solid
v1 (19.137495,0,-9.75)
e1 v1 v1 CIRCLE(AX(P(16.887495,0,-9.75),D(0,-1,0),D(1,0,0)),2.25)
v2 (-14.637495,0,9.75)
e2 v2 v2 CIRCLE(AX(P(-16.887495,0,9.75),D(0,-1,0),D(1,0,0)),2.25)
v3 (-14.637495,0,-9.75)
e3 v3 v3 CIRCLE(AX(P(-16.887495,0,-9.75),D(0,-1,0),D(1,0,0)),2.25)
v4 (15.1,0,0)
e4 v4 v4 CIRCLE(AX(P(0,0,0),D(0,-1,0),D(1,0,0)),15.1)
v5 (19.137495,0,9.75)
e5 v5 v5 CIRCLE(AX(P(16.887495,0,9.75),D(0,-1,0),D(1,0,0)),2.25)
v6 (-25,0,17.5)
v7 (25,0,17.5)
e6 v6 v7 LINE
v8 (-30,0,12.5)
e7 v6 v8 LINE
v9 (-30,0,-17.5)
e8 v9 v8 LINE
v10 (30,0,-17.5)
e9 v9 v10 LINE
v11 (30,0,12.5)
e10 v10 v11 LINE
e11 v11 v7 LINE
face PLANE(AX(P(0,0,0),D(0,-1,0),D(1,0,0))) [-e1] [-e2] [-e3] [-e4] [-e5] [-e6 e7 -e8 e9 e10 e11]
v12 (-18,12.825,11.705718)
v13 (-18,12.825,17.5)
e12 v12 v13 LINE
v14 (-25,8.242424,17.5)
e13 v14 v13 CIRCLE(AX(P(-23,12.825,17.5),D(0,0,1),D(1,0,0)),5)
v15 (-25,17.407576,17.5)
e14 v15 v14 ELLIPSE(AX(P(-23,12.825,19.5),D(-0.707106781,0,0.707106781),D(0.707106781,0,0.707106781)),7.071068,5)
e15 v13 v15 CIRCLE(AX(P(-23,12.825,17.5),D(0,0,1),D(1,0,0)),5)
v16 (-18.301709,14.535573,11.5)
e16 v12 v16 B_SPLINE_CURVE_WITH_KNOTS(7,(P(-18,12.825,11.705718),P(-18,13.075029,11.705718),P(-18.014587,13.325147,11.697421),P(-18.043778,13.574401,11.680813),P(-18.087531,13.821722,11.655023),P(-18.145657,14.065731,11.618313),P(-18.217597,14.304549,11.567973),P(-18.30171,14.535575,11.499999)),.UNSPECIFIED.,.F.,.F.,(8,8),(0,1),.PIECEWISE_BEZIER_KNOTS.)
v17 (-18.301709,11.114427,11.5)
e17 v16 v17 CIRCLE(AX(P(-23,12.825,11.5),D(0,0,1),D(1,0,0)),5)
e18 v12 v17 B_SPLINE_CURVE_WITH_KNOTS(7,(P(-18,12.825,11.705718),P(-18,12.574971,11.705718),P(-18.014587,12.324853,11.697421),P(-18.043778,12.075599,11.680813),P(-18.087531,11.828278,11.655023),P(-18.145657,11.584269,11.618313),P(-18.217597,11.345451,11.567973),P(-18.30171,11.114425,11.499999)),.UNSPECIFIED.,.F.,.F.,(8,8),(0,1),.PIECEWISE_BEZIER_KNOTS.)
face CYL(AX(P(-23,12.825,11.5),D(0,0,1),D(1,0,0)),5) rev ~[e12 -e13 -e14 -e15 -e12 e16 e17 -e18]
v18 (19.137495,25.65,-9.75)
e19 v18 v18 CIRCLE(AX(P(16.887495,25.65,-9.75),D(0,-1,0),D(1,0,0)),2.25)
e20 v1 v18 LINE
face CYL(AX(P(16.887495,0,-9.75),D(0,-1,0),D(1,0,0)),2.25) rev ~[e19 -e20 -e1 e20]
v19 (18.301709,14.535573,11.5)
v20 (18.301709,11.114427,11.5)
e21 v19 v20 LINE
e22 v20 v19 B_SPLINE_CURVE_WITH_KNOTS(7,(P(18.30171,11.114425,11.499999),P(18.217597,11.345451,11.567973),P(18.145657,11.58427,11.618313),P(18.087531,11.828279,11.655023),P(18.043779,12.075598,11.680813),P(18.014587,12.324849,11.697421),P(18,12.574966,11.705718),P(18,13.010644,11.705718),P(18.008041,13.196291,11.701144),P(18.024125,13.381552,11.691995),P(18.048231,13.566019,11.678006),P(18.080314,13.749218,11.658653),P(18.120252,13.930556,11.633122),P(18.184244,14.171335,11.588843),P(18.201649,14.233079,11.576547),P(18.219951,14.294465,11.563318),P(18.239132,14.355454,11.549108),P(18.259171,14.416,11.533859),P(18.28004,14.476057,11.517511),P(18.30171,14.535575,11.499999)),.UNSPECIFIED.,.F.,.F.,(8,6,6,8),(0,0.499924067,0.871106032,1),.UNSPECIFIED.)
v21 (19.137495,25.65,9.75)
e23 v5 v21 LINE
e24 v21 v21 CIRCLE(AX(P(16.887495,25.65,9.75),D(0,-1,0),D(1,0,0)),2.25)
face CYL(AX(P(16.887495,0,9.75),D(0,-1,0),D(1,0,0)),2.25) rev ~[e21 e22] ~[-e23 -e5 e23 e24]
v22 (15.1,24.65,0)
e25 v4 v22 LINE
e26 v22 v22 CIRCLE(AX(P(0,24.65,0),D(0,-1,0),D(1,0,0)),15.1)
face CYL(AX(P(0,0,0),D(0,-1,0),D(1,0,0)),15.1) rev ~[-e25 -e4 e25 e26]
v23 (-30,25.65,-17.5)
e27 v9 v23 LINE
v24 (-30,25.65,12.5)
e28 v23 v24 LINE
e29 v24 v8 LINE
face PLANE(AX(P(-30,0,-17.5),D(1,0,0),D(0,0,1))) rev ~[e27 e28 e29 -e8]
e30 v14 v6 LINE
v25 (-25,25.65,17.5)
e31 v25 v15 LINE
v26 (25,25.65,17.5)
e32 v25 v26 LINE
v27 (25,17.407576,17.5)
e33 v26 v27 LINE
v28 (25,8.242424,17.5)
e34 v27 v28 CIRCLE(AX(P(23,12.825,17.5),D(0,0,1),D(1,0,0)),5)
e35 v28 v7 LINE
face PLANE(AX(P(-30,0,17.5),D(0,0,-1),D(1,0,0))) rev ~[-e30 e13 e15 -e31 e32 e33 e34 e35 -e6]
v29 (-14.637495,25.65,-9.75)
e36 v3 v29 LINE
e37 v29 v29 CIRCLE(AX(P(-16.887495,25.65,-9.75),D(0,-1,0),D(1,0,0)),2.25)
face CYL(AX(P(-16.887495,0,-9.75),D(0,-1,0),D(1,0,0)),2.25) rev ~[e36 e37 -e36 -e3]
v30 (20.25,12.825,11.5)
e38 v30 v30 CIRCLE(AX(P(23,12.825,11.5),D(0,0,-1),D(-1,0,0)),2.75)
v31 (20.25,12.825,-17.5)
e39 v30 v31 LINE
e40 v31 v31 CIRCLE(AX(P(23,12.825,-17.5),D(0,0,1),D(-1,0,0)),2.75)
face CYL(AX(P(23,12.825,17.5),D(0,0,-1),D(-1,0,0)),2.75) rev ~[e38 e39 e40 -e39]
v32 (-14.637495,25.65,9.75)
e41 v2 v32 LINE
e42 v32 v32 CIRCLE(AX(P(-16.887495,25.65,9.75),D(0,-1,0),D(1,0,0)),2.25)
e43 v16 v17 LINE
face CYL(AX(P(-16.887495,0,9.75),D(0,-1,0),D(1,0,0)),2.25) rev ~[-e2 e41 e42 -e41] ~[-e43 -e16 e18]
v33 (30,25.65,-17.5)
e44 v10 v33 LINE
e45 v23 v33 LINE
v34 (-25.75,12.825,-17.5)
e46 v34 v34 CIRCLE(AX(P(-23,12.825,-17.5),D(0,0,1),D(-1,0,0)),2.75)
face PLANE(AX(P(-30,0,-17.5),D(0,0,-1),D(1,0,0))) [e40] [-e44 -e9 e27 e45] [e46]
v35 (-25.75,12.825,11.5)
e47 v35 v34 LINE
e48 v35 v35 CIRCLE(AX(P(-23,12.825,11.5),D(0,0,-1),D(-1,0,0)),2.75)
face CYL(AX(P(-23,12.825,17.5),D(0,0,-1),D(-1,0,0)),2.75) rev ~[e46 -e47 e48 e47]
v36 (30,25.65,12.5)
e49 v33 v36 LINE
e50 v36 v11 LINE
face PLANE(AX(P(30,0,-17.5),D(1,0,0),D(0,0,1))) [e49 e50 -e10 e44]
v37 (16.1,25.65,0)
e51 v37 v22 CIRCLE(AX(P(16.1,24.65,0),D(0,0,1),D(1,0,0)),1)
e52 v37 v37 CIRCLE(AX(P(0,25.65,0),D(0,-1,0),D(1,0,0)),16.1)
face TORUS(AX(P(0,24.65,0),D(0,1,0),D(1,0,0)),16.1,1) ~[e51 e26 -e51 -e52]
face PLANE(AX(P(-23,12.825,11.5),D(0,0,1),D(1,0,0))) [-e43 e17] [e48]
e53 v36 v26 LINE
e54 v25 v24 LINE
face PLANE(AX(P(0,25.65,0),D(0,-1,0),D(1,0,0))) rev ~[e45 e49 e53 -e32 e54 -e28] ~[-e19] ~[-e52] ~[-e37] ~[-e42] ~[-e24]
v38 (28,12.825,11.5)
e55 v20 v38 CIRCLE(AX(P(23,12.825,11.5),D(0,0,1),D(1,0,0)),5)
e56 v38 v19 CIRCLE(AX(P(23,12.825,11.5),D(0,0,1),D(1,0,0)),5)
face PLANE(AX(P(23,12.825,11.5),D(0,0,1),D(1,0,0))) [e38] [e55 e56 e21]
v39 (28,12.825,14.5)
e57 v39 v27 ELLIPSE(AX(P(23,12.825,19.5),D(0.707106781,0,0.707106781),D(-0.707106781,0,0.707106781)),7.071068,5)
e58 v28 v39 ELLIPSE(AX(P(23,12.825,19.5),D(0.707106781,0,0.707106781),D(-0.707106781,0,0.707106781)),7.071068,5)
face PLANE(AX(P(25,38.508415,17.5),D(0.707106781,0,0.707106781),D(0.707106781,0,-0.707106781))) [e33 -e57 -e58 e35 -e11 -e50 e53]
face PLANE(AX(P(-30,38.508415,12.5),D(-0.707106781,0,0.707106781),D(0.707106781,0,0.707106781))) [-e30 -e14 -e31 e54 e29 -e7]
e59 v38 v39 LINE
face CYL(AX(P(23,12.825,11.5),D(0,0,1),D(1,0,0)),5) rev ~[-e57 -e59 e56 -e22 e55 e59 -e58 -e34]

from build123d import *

# Parameters (mm, degrees)
F0_W           = 60
F0_H           = 35
F0_R           = 2.25
F0_R_2         = 15.1
F1_DEPTH       = 25.65
F3_D           = 5.5
F3_DEPTH       = 35
F3_CBORE_D     = 10
F3_CBORE_DEPTH = 6
F3_TIP         = 1.6523667023
F4_T1_DEPTH    = 51.3668298797
F5_R           = 1


# Not quite as in the source:
# - a fillet or chamfer that OpenCascade refuses, or shapes differently, is made with other operations: its cross-section is extruded or revolved along the edge and cut away or added


with BuildPart() as f1:
    # F0 (on Front) → F1 (new body)
    with BuildSketch(Plane.XZ):
        Rectangle(F0_W, F0_H)
        with Locations((-16.8874953738, -9.75)):
            Circle(F0_R, mode=Mode.SUBTRACT)
        with Locations((16.8874953738, -9.75)):
            Circle(F0_R, mode=Mode.SUBTRACT)
        with Locations((-16.8874953738, 9.75)):
            Circle(F0_R, mode=Mode.SUBTRACT)
        Circle(F0_R_2, mode=Mode.SUBTRACT)
        with Locations((16.8874953738, 9.75)):
            Circle(F0_R, mode=Mode.SUBTRACT)
    extrude(amount=-F1_DEPTH)

    # F3
    with Locations(Plane.XY.offset(17.5)):
        with Locations((-23, 12.825), (23, 12.825)):
            CounterBoreHole(F3_D / 2, F3_CBORE_D / 2, F3_CBORE_DEPTH, depth=F3_DEPTH)
            with Locations((0, 0, -(F3_DEPTH + F3_TIP / 2))):  # 118° drill point
                Cone(0, F3_D / 2, F3_TIP, mode=Mode.SUBTRACT)

    # F4: chamfer of 5 on 2 edges, made by hand

    # F4_s2 → F4_t1 (cut)
    with BuildSketch(Plane.XZ.offset(-38.5084149398)):
        Polygon((25, 17.5), (30, 12.5), (30, 17.5), align=None)
        Polygon((-30, 12.5), (-25, 17.5), (-30, 17.5), align=None)
    extrude(amount=F4_T1_DEPTH, mode=Mode.SUBTRACT)

    # F5
    f5_edges = [f1.edges().sort_by_distance(p)[0] for p in [
        (-15.1, 25.65, 0),
    ]]
    fillet(f5_edges, radius=F5_R)


solid = f1.part
